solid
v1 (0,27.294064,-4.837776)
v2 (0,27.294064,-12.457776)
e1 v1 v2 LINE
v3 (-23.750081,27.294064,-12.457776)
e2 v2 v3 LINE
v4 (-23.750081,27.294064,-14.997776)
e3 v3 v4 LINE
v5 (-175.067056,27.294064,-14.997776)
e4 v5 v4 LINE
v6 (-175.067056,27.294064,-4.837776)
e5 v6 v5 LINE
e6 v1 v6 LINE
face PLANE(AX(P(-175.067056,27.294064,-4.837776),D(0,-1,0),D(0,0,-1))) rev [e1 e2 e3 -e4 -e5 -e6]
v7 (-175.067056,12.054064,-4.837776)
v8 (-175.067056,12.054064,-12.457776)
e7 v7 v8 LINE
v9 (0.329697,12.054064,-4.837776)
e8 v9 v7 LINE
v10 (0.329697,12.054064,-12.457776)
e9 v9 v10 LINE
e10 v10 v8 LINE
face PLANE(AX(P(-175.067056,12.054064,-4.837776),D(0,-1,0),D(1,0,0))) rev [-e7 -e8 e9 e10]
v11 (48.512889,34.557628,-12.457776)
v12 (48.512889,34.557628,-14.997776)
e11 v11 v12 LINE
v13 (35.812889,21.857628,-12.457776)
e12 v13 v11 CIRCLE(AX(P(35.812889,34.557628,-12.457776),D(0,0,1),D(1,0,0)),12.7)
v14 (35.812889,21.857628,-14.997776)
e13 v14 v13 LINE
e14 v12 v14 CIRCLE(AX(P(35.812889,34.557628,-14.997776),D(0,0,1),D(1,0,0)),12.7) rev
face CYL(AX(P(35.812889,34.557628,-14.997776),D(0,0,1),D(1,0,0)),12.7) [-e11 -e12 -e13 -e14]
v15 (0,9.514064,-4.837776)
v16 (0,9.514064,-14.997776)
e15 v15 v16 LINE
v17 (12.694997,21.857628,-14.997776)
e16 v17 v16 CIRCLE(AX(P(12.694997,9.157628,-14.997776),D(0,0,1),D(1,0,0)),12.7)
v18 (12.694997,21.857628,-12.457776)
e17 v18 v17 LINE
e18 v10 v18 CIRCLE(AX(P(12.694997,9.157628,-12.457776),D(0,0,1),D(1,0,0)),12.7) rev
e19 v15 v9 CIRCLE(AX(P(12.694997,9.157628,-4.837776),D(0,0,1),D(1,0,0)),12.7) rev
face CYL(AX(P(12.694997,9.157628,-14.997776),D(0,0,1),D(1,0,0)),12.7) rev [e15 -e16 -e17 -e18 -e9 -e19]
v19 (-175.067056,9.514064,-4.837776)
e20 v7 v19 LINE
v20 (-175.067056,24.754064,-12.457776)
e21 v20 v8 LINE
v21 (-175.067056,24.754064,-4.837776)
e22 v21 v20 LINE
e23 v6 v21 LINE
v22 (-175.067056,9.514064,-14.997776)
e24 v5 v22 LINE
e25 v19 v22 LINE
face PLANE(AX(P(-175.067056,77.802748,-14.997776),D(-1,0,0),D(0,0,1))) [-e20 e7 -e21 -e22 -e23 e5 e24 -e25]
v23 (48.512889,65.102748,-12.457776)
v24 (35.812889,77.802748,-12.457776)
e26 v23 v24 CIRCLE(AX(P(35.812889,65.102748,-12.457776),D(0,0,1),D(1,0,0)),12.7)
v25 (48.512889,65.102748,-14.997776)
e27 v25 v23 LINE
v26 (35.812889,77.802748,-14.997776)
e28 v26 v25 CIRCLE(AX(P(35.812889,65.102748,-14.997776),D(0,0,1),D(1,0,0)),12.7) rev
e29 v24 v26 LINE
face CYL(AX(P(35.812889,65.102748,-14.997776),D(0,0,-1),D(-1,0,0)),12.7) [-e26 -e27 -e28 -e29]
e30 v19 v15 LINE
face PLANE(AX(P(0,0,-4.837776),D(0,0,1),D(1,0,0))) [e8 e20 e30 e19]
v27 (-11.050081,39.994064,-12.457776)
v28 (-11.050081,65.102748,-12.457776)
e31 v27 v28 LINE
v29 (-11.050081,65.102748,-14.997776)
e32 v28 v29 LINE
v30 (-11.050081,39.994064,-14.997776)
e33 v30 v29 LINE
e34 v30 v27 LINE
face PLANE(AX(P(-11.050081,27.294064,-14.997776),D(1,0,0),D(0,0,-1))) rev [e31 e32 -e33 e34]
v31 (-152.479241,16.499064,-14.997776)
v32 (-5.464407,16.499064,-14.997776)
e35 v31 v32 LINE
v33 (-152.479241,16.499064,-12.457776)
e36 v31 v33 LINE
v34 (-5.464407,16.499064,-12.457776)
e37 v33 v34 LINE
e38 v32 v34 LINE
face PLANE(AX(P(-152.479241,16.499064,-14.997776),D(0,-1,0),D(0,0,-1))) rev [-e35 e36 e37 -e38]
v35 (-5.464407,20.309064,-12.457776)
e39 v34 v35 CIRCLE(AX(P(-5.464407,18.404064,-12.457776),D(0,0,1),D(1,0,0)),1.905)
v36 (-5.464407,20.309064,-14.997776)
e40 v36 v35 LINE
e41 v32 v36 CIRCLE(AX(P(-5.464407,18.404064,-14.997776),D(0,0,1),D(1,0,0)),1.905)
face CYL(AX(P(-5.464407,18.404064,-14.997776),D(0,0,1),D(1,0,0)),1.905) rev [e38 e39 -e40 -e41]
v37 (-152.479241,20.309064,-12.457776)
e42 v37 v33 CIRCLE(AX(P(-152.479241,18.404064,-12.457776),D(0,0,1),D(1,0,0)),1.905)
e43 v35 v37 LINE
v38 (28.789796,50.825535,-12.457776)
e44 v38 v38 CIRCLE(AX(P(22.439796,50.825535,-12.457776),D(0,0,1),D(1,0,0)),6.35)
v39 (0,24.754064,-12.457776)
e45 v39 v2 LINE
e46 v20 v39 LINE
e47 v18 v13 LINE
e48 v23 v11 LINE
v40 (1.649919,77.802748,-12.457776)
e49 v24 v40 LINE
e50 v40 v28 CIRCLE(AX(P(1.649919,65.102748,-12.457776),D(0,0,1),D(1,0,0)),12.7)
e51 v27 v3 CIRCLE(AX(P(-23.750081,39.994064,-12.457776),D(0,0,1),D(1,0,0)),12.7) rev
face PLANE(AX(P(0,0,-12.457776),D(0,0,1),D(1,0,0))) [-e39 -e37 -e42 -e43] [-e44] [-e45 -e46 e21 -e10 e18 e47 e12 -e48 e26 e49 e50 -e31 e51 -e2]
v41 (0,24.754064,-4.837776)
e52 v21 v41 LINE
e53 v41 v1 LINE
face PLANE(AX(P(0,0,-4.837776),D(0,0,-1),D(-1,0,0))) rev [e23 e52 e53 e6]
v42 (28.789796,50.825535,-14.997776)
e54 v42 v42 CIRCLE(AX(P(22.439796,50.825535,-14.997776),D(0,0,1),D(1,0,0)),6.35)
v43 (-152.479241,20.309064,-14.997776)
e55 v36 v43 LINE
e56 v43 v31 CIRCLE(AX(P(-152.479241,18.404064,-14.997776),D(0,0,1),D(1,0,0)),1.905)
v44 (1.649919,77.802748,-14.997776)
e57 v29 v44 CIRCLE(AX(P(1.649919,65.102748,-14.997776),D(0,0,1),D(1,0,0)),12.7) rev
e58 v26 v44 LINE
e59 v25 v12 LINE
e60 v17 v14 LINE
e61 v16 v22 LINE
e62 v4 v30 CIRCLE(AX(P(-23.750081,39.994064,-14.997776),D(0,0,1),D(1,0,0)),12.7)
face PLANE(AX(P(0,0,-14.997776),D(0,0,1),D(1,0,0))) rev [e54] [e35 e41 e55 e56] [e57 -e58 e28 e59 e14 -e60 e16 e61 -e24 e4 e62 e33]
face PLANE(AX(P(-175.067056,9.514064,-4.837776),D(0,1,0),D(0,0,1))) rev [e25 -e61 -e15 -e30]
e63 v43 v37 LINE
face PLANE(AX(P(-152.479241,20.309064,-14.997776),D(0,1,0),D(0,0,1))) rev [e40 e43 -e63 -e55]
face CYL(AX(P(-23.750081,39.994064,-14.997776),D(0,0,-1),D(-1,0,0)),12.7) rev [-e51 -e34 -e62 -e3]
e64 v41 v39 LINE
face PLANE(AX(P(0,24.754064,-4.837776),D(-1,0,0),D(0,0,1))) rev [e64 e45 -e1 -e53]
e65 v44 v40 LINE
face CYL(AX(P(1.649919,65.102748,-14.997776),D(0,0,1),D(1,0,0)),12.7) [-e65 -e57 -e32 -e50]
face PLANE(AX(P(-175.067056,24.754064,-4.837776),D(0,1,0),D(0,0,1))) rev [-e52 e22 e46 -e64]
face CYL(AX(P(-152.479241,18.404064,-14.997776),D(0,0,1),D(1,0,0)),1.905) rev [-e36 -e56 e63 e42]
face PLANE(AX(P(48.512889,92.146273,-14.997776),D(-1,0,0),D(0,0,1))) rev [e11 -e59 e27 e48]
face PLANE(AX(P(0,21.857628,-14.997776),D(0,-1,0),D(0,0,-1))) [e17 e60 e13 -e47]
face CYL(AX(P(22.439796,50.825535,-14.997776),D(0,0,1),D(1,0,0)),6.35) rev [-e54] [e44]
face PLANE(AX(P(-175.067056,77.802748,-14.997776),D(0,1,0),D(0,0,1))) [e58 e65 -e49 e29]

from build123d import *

# Parameters (mm, degrees)
BOSS_EXTRUDE1_DEPTH = 2.54
SKETCH2_R           = 6.35
CUT_EXTRUDE1_DEPTH  = 2.54
SKETCH3_W           = 175.067056309
SKETCH3_H           = 2.54
BOSS_EXTRUDE2_DEPTH = 7.62
SKETCH4_W           = 175.067056309
SKETCH4_H           = 29.21
SKETCH4_W_2         = 164.016975536
SKETCH4_H_2         = 66.475239383
SKETCH4_W_3         = 84.822418372
SKETCH4_H_3         = 89.286756182
CUT_EXTRUDE2_DEPTH  = 2.54
FILLET1_R           = 12.7


with BuildPart() as part:
    # Sketch1 → Boss-Extrude1 (new body)
    with BuildSketch(Plane.XY.offset(-12.457776114)):
        Polygon((-175.067056309, 77.80274772), (129.732943691, 77.80274772), (129.732943691, 21.857628122), (0, 21.857628122), (0, -19.695936064), (-175.067056309, -19.695936064), align=None)
        with BuildLine():
            Line((-152.479240823, 20.309063936), (-5.464407031, 20.309063936))
            ThreePointArc((-5.464407031, 20.309063936), (-3.559407031, 18.404063936), (-5.464407031, 16.499063936))
            Line((-5.464407031, 16.499063936), (-152.479240823, 16.499063936))
            ThreePointArc((-152.479240823, 16.499063936), (-154.384240823, 18.404063936), (-152.479240823, 20.309063936))
        make_face(mode=Mode.SUBTRACT)
    extrude(amount=-BOSS_EXTRUDE1_DEPTH)

    # Sketch2 → Cut-Extrude1 (cut)
    with BuildSketch(Plane.XY.offset(-12.457776114)):
        with Locations((22.439796045, 50.825535486)):
            Circle(SKETCH2_R)
    extrude(amount=-CUT_EXTRUDE1_DEPTH, mode=Mode.SUBTRACT)

    # Sketch3 → Boss-Extrude2 (add)
    with BuildSketch(Plane.XY.offset(-12.457776114)):
        with Locations((-87.533528155, 26.024063936)):
            Rectangle(SKETCH3_W, SKETCH3_H)
        with Locations((-87.533528155, 10.784063936)):
            Rectangle(SKETCH3_W, SKETCH3_H)
    extrude(amount=BOSS_EXTRUDE2_DEPTH)

    # Sketch4 → Cut-Extrude2 (cut)
    with BuildSketch(Plane.XY.offset(-12.457776114)):
        with Locations((-87.533528155, -5.090936064)):
            Rectangle(SKETCH4_W, SKETCH4_H)
        with Locations((-93.058568541, 60.531683628)):
            Rectangle(SKETCH4_W_2, SKETCH4_H_2)
        with Locations((90.924098408, 47.502895008)):
            Rectangle(SKETCH4_W_3, SKETCH4_H_3)
    extrude(amount=-CUT_EXTRUDE2_DEPTH, mode=Mode.SUBTRACT)

    # Fillet1
    # the kernel refuses this fillet: 12.7 mm, written as the material it adds along each edge
    with BuildSketch(Plane(origin=(-11.050080773, 27.294063936, -12.457776114), x_dir=(0, 1, 0), z_dir=(0, 0, -1))) as fillet1_piece_1:
        with BuildLine():
            CenterArc((FILLET1_R, -FILLET1_R), FILLET1_R, 90, 90)
            Line((0, -FILLET1_R), (0, 0))
            Line((0, 0), (FILLET1_R, 0))
        make_face()
    extrude(amount=2.54)
    with BuildSketch(Plane(origin=(0, 21.857628122, 19.279716847), x_dir=(0, -1, 0), z_dir=(0, 0, -1))) as fillet1_piece_2_section:
        with BuildLine():
            CenterArc((12.7, -12.694997184), FILLET1_R, 91.608263763, 88.391736237)
            Line((0, -12.694997184), (0, 0))
            Line((0, 0), (12.343564187, 0))
        make_face()
    fillet1_piece_2 = extrude(amount=34.277492961, mode=Mode.PRIVATE)
    fillet1_piece_2 = split(fillet1_piece_2, bisect_by=Plane(origin=(0, 12.054063936, 19.279716847), z_dir=(0, -1, 0)), keep=Keep.TOP, mode=Mode.PRIVATE)
    fillet1_piece_2 = split(fillet1_piece_2, bisect_by=Plane(origin=(0, 21.857628122, -4.837776114), z_dir=(0, 0, -1)), keep=Keep.TOP, mode=Mode.PRIVATE)
    add(fillet1_piece_2)
    with BuildSketch(Plane(origin=(0, 21.857628122, -12.457776114), x_dir=(0, -1, 0), z_dir=(0, 0, -1))) as fillet1_piece_3:
        with BuildLine():
            CenterArc((12.7, -12.694997184), FILLET1_R, 91.608263763, 88.391736237)
            Line((0, -12.694997184), (0, 0))
            Line((0, 0), (12.343564187, 0))
        make_face()
    extrude(amount=2.54)
    # the kernel refuses this fillet: 12.7 mm, written as the material it takes off along each edge
    with BuildSketch(Plane(origin=(48.512889222, 21.857628122, -46.747776114), x_dir=(-1, 0, 0), z_dir=(0, 0, 1)), Plane(origin=(48.512889222, 77.80274772, 19.292223886), x_dir=(-1, 0, 0), z_dir=(0, 0, -1)), Plane(origin=(-11.050080773, 77.80274772, -46.747776114), x_dir=(1, 0, 0), z_dir=(0, 0, 1))) as fillet1_2_piece_1:
        with BuildLine():
            CenterArc((FILLET1_R, -FILLET1_R), FILLET1_R, 90, 90)
            Line((0, -FILLET1_R), (0, 0))
            Line((0, 0), (FILLET1_R, 0))
        make_face()
    extrude(amount=66.04, mode=Mode.SUBTRACT)


solid = part.part
